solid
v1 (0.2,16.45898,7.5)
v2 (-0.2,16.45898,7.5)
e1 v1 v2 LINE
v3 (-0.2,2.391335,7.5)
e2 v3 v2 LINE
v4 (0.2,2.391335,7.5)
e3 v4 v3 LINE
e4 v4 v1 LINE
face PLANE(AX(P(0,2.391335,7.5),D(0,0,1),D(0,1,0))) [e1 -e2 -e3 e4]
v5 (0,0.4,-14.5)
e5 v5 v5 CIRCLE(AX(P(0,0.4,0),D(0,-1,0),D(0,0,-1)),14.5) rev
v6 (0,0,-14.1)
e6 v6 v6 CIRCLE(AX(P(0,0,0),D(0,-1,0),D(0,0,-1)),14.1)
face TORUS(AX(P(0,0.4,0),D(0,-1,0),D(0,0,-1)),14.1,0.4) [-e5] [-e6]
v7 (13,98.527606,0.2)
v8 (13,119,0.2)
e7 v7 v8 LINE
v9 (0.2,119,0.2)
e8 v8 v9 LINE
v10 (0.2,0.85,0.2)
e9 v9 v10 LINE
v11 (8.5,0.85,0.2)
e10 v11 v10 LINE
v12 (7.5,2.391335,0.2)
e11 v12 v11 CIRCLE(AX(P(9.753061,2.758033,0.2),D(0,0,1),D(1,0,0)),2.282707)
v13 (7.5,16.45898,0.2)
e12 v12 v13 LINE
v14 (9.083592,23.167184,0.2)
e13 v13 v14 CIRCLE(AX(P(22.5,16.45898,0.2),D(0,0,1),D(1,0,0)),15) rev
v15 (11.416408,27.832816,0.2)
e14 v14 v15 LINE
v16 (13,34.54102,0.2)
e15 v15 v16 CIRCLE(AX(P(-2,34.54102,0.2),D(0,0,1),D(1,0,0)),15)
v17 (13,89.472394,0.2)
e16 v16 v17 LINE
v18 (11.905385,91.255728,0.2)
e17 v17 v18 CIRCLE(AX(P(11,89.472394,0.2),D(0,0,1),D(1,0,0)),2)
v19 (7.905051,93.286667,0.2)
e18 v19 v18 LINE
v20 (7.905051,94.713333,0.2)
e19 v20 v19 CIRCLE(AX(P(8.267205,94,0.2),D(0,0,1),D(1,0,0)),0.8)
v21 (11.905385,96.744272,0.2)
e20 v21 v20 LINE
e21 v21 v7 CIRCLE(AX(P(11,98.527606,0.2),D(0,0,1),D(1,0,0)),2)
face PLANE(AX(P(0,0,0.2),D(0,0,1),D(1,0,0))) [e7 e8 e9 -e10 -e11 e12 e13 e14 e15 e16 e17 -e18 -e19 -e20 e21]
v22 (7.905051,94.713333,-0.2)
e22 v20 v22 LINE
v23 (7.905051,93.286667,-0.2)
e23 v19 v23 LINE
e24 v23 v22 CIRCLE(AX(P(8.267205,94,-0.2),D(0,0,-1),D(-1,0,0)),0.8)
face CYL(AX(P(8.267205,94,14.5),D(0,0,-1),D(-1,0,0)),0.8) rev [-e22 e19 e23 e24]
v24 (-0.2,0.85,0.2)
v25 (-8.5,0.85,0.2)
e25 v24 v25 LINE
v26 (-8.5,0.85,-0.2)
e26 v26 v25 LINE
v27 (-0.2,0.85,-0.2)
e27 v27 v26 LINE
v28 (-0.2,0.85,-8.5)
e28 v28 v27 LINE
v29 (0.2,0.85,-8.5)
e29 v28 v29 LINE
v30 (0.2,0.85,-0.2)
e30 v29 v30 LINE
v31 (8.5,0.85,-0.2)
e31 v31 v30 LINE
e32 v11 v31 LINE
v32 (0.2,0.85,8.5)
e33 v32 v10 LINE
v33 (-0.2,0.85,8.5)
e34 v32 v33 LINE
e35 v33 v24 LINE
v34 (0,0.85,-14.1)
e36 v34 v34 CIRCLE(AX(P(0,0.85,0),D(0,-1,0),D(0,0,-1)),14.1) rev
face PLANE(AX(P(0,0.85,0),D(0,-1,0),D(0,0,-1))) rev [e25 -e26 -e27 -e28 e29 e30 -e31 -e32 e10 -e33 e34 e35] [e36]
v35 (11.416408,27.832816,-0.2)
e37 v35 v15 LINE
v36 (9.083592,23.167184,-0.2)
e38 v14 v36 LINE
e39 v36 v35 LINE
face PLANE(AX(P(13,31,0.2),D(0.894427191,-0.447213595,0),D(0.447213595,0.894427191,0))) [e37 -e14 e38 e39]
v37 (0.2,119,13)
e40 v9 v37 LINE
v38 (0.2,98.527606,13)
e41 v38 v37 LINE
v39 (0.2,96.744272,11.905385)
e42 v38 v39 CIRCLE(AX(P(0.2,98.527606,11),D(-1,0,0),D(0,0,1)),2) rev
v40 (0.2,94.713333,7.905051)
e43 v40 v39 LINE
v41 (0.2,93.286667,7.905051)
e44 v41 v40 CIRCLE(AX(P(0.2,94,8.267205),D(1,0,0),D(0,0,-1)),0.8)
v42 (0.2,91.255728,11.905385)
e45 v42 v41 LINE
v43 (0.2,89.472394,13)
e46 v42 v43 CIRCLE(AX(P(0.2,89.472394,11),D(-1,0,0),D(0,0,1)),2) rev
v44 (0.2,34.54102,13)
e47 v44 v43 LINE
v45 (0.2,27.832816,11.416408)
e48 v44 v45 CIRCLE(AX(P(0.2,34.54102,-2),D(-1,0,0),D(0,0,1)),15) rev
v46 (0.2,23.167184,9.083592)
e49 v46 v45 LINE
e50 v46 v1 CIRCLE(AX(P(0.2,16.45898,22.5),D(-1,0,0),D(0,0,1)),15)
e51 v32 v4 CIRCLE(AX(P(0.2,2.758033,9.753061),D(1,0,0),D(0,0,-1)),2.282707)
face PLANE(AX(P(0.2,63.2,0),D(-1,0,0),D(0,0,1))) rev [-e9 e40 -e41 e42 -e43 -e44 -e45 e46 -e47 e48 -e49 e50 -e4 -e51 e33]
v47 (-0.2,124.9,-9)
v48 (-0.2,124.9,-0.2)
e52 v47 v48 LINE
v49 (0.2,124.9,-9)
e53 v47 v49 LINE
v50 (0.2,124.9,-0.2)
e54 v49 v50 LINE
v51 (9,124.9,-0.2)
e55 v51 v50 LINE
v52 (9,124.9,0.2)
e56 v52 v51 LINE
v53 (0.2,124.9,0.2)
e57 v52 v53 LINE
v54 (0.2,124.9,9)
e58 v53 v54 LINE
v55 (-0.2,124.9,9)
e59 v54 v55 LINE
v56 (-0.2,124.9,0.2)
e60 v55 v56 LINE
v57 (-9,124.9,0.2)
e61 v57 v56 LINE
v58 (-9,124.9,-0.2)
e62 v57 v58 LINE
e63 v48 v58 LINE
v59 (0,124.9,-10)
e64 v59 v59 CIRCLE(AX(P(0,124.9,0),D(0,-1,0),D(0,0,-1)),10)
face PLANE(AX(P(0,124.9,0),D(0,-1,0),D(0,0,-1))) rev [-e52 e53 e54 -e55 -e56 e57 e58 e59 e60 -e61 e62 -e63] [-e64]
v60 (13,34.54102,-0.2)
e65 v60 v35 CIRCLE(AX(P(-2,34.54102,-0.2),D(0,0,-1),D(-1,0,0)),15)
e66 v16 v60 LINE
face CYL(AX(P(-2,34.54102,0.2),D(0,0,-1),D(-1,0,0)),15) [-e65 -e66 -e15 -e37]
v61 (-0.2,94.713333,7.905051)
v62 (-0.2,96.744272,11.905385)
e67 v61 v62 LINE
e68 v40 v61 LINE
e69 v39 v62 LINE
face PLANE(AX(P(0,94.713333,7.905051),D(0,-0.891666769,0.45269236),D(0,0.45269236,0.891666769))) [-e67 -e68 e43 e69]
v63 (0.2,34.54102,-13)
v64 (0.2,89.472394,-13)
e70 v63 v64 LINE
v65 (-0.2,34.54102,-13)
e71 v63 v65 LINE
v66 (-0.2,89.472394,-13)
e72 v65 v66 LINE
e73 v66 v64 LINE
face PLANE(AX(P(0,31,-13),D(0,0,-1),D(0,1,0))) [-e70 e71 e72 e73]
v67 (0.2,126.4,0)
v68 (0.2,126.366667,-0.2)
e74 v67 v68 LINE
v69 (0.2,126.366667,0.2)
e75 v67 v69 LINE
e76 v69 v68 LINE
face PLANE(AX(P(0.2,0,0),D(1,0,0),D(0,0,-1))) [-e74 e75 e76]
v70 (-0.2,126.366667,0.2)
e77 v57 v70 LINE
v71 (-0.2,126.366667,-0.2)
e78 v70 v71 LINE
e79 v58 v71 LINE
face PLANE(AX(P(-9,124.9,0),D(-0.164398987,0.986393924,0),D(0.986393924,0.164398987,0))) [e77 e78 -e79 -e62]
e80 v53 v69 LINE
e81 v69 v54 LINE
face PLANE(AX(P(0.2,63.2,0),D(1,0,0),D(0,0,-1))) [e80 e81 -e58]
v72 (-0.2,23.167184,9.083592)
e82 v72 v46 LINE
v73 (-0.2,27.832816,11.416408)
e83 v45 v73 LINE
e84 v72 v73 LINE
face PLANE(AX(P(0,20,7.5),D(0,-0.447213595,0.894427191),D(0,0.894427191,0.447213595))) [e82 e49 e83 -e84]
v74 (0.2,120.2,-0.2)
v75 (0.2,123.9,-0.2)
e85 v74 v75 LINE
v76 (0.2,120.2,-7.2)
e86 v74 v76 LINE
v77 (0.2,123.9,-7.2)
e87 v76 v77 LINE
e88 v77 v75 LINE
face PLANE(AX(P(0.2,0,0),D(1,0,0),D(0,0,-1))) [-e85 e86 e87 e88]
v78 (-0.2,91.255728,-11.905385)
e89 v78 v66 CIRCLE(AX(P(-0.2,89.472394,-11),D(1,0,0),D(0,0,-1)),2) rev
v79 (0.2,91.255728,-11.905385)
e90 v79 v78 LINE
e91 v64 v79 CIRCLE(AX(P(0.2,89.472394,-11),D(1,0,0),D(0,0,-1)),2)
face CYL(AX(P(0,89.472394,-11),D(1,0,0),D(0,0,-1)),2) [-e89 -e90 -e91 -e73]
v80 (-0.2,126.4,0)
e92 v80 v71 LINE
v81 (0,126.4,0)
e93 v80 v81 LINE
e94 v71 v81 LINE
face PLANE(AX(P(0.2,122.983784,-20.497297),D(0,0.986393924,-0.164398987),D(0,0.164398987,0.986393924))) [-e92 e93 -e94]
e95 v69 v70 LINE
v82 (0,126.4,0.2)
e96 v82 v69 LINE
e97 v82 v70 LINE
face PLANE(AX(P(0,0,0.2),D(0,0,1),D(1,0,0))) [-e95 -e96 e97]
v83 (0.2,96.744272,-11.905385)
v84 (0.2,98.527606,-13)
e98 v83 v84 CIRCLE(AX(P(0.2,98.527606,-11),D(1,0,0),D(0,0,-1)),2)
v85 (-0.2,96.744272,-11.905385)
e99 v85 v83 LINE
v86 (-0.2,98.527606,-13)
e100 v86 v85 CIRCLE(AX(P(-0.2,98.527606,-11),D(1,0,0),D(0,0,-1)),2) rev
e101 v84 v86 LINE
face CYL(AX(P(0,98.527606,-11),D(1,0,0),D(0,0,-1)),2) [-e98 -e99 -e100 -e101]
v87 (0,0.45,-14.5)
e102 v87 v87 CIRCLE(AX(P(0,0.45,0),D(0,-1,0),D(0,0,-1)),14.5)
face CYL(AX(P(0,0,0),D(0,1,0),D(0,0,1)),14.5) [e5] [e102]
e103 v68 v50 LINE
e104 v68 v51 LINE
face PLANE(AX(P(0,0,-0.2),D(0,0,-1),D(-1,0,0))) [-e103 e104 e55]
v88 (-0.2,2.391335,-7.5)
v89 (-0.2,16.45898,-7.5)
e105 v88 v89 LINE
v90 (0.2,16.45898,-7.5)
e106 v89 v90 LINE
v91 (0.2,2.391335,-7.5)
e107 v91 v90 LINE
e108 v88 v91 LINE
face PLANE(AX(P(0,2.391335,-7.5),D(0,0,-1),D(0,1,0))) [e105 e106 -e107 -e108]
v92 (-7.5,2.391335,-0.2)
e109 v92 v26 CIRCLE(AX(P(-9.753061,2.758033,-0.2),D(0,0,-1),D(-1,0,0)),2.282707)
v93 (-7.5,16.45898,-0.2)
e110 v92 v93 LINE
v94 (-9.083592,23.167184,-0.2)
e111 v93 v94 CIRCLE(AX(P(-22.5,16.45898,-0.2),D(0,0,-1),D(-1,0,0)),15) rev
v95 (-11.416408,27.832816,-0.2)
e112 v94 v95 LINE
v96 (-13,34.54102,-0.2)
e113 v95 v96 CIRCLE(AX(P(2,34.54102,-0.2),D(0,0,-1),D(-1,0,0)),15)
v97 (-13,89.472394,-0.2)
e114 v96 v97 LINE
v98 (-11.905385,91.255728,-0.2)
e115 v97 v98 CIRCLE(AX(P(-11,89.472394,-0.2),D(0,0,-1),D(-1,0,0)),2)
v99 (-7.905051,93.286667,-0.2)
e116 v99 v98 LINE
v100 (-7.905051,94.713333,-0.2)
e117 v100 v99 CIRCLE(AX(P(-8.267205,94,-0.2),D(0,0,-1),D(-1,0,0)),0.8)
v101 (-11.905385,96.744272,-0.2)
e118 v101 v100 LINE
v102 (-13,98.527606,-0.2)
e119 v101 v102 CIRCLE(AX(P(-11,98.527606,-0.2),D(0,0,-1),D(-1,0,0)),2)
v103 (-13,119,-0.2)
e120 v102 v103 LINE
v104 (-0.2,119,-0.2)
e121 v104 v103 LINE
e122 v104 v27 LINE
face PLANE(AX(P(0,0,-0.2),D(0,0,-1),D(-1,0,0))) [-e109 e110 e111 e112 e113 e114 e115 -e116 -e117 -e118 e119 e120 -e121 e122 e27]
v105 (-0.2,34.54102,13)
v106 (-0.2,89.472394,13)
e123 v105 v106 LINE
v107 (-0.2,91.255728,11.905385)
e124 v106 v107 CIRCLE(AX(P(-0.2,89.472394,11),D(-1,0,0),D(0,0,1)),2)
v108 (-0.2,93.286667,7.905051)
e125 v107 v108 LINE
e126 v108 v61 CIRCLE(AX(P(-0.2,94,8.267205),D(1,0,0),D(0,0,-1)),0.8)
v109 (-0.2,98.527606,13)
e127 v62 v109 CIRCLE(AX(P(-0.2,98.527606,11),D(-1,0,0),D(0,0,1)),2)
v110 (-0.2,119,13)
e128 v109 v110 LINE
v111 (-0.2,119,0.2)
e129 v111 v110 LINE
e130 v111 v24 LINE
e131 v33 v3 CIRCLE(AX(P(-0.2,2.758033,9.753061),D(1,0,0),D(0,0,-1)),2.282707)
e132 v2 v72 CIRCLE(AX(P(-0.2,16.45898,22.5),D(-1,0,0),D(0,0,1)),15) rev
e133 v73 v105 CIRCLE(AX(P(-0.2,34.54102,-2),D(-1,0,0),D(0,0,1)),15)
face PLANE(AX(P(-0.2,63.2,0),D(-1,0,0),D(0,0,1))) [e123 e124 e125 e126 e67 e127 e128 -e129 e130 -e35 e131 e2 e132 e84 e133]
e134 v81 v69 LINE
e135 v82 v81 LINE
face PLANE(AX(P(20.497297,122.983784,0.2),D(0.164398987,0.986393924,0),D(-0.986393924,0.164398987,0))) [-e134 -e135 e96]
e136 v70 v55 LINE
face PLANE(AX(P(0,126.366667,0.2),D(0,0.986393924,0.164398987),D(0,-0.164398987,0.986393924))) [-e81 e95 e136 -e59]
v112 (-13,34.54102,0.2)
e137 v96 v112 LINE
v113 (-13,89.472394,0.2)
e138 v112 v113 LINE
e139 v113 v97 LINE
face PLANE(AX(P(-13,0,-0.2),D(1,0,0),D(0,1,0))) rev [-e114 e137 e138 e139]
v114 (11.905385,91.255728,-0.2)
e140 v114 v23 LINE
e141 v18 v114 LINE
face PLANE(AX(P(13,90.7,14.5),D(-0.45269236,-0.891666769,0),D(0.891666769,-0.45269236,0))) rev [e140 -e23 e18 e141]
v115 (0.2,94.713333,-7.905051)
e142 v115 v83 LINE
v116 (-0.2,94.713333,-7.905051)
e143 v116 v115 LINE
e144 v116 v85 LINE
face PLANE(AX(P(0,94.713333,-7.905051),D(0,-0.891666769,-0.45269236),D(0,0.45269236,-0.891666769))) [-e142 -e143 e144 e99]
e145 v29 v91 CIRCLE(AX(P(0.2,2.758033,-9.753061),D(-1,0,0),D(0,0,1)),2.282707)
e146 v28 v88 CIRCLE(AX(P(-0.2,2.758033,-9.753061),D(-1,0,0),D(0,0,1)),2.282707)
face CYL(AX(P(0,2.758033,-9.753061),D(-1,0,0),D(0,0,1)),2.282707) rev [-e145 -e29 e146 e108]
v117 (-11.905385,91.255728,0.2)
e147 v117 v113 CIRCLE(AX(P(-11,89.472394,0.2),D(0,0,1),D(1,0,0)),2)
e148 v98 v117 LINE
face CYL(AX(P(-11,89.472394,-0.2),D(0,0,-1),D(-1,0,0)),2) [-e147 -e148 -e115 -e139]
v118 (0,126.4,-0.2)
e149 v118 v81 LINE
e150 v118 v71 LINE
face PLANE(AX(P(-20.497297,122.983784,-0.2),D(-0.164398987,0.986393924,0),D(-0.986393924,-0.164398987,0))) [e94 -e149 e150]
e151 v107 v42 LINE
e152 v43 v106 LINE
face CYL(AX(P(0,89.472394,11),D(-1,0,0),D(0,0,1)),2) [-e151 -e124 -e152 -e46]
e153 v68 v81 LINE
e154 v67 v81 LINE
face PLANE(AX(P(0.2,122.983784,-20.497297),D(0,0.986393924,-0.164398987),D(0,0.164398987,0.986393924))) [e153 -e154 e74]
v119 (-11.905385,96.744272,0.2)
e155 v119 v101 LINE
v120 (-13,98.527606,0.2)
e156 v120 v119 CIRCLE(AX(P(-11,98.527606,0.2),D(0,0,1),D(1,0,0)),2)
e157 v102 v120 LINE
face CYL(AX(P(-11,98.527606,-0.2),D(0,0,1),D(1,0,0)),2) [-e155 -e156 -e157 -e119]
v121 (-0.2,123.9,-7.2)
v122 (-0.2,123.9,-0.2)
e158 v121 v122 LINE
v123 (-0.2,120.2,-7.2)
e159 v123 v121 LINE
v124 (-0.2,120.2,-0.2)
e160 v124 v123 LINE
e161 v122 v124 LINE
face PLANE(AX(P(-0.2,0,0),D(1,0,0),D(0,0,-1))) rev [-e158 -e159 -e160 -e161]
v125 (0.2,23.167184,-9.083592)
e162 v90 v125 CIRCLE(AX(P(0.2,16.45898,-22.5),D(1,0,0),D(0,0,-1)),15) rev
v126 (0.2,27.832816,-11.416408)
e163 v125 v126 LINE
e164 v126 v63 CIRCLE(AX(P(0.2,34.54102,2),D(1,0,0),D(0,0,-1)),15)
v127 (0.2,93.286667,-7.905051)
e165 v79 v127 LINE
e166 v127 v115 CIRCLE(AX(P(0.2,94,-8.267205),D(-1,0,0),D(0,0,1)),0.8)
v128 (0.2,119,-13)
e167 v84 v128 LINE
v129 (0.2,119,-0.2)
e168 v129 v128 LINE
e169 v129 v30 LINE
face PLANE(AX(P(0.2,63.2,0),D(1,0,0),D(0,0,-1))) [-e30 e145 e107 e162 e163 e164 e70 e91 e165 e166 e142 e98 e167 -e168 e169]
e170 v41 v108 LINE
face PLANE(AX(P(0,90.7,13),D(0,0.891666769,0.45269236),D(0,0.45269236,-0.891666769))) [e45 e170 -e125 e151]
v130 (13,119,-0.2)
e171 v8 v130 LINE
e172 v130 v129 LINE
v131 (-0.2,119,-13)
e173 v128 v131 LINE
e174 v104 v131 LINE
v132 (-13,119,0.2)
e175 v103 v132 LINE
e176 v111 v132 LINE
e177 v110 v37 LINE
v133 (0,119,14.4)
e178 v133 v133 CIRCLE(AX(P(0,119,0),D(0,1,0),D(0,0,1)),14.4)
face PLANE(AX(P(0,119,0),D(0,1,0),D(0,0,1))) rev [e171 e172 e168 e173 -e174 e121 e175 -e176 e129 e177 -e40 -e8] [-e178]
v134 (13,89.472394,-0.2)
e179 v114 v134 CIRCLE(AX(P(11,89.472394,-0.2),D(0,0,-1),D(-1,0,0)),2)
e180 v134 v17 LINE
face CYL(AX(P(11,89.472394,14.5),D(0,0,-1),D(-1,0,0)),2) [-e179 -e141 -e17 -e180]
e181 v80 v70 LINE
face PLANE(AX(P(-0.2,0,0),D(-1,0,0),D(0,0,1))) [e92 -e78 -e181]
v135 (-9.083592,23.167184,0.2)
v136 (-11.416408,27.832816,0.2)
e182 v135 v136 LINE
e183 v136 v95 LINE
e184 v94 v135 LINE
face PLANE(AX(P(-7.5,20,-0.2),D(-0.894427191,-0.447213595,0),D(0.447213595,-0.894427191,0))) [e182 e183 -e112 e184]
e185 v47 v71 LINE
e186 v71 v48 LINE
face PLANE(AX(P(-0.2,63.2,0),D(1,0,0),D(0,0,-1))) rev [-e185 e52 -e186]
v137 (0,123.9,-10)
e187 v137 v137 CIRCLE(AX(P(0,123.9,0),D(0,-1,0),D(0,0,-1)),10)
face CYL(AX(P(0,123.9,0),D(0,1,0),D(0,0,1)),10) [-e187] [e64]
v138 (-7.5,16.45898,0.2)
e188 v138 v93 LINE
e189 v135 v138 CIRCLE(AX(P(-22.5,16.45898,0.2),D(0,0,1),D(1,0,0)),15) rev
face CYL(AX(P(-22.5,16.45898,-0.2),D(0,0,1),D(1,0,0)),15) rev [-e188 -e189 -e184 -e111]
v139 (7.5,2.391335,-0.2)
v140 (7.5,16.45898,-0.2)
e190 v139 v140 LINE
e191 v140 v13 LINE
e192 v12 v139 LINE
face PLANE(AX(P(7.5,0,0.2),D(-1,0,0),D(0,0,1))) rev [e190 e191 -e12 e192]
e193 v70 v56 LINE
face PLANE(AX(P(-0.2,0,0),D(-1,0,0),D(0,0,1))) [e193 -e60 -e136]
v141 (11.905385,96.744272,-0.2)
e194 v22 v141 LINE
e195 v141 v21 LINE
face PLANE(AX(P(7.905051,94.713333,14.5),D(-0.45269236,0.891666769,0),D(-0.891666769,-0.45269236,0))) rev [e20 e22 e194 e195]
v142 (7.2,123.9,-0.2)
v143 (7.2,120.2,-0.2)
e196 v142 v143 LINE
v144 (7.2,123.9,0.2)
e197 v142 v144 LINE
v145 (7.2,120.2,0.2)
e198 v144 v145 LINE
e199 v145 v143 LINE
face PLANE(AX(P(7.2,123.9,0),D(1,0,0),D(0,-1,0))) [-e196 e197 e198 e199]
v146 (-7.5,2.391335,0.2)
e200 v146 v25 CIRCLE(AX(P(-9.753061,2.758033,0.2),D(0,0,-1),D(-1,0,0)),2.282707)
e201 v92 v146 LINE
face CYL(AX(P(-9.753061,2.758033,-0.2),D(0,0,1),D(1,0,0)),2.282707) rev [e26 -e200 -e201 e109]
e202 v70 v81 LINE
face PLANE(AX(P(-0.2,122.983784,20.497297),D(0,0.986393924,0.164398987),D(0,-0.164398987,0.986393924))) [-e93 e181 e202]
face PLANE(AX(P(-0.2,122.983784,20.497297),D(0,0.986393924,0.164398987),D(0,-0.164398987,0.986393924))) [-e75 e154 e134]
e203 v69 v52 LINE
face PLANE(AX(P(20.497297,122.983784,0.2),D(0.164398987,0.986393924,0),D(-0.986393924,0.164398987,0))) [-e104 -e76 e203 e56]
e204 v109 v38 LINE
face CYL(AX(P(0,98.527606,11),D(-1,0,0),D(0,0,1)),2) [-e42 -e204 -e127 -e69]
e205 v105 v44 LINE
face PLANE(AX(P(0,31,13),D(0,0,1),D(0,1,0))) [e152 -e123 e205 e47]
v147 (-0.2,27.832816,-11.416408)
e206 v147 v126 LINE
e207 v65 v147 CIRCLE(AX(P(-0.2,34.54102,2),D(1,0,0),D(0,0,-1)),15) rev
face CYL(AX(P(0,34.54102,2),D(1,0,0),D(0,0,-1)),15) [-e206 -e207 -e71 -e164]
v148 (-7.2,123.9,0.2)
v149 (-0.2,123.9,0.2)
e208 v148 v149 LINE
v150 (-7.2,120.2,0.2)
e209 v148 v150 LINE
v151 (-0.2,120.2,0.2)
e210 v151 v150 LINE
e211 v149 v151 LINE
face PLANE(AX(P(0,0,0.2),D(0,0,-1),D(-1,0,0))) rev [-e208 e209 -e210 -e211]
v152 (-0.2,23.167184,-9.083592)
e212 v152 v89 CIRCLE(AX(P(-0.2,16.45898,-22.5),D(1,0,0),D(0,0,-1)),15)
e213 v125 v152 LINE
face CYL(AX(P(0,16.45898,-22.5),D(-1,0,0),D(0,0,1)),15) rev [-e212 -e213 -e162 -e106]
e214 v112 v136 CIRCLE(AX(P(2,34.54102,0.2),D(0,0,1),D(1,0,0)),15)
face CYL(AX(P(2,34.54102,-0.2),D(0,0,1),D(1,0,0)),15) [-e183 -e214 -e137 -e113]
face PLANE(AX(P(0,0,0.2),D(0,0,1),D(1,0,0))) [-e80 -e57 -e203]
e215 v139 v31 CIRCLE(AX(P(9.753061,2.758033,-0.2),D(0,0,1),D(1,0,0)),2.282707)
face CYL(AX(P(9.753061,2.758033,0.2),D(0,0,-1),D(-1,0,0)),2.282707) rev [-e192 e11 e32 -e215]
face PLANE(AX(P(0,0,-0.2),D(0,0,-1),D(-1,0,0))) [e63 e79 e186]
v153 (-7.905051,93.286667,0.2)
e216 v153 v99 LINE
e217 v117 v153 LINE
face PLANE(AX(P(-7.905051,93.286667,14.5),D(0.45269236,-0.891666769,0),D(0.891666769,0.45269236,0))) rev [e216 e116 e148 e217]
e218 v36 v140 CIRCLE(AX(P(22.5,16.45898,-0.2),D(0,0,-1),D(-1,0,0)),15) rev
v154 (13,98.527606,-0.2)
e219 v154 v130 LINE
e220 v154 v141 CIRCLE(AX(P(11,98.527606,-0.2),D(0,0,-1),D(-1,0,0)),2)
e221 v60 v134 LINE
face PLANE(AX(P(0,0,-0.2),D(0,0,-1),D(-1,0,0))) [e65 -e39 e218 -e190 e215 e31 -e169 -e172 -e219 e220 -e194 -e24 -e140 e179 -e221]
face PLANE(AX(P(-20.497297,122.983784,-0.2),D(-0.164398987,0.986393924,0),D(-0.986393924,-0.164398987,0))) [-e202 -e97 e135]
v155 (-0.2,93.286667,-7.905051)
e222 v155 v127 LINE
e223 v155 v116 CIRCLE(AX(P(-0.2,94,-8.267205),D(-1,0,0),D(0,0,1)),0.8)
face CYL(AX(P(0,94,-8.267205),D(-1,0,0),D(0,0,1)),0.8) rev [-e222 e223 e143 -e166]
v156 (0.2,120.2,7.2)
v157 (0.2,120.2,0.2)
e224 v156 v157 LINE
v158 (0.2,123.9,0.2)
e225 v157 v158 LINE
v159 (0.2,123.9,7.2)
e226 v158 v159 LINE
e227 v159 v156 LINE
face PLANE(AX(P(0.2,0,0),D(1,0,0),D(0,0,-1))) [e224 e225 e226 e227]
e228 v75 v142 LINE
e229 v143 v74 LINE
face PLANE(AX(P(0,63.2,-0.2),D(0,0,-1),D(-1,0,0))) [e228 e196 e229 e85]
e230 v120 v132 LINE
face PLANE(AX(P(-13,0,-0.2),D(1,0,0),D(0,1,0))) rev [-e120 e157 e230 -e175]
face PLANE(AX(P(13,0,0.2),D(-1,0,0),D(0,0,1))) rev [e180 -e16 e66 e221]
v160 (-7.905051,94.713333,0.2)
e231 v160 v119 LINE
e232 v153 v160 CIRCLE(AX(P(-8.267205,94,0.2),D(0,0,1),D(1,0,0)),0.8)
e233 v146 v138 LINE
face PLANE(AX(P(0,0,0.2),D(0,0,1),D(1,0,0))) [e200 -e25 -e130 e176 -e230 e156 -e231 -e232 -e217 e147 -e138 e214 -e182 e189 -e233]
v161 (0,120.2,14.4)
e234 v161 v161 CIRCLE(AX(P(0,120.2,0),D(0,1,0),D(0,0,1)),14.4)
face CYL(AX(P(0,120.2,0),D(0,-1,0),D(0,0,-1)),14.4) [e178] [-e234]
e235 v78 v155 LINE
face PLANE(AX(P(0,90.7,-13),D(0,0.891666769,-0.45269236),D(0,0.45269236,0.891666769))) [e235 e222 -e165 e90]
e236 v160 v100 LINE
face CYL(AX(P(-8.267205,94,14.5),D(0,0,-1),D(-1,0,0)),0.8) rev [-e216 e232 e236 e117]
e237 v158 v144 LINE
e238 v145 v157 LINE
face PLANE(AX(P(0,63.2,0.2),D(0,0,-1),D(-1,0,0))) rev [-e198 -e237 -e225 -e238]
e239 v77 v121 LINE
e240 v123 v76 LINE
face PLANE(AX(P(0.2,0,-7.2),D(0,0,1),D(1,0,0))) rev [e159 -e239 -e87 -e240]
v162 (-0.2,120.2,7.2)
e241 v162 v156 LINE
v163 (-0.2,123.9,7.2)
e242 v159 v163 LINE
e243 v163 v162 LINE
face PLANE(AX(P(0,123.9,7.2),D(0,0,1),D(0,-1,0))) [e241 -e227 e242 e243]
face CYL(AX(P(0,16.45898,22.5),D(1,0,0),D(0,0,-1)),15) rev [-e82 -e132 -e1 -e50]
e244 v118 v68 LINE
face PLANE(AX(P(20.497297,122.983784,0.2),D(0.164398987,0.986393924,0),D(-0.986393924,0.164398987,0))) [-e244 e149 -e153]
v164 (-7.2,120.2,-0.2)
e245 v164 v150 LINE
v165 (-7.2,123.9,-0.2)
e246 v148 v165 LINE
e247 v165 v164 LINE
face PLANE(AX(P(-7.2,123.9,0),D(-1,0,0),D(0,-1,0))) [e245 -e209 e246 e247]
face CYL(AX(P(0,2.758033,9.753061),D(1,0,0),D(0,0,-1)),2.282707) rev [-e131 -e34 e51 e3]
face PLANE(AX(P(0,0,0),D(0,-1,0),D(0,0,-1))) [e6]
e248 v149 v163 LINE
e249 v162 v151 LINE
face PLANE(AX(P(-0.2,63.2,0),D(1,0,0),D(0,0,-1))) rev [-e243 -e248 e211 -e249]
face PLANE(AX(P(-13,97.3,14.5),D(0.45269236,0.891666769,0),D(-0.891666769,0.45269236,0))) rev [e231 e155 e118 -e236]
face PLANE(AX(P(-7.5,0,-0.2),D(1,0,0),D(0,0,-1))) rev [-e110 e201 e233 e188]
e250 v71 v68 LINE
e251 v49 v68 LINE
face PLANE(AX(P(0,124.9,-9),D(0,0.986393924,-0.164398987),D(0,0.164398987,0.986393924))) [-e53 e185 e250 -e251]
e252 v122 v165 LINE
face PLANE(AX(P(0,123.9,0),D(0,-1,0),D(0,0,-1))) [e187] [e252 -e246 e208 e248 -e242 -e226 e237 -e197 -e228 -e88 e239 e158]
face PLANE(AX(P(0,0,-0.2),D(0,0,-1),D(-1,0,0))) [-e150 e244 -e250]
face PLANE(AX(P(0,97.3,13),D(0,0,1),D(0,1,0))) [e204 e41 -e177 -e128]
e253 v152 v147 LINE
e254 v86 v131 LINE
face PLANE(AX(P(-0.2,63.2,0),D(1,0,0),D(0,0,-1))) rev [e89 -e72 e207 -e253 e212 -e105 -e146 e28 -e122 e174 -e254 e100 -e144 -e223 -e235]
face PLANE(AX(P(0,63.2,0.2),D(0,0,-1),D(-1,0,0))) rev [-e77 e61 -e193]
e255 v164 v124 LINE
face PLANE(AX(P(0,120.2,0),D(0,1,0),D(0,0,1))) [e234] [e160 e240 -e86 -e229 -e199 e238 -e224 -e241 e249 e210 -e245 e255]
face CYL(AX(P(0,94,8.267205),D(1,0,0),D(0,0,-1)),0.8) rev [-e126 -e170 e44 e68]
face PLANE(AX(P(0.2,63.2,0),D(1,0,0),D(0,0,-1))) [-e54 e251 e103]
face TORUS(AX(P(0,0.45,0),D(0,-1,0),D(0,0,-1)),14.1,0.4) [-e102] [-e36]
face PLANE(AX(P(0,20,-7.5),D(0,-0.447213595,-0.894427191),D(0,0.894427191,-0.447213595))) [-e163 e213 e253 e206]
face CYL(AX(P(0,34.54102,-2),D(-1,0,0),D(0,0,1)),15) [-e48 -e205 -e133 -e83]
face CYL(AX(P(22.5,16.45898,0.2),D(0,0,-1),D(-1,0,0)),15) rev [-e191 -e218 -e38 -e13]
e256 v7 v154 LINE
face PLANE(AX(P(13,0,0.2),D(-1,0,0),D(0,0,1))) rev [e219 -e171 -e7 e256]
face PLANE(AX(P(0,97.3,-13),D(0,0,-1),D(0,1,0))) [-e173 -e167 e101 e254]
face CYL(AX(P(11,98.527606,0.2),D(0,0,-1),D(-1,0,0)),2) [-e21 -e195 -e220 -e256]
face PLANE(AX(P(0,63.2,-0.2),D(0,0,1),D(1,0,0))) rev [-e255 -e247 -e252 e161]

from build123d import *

# Parameters (mm, degrees)
EXTRUDE_START         = -0.2
EXTRUDE_1_OUTLINE_W   = 0.4
EXTRUDE_1_OUTLINE_H   = 3.7
EXTRUDE_1_DEPTH       = 0.4
EXTRUDE_START_2       = -7.2
EXTRUDE_1_2_OUTLINE_W = 0.4
EXTRUDE_1_2_OUTLINE_H = 3.7
EXTRUDE_1_2_DEPTH     = 7
EXTRUDE_START_3       = 119
EXTRUDE_1_3_OUTLINE_R = 14.4
EXTRUDE_1_3_DEPTH     = 1.2
EXTRUDE_1_4_OUTLINE_R = 14.5
EXTRUDE_1_4_DEPTH     = 0.85
EXTRUDE_START_4       = 123.9
EXTRUDE_1_5_OUTLINE_R = 10
EXTRUDE_1_5_DEPTH     = 1
EXTRUDE_1_6_DEPTH     = 0.4
CUT_EXTRUDE_1_DEPTH   = 129.075368436
CUT_EXTRUDE_2_DEPTH   = 129.075368436
DRAFT_1_ANGLE         = 63.434948823
DRAFT_2_ANGLE         = 63.434948823
RIB_1_REACH           = 130.053
SKETCH_4_WALL_W       = 267.026519706
SKETCH_4_WALL_H       = 0.4
RIB_2_REACH           = 130.053
SKETCH_5_WALL_W       = 267.026519706
SKETCH_5_WALL_H       = 0.4
RIB_3_REACH           = 130.053
SKETCH_6_WALL_W       = 267.026519706
SKETCH_6_WALL_H       = 0.4
RIB_4_REACH           = 130.053
SKETCH_7_WALL_W       = 261.805134662
SKETCH_7_WALL_H       = 0.4
RIB_5_REACH           = 130.053
SKETCH_8_WALL_W       = 261.805134662
SKETCH_8_WALL_H       = 0.4
RIB_6_REACH           = 130.053
SKETCH_9_WALL_W       = 261.805134662
SKETCH_9_WALL_H       = 0.4
RIB_START             = -0.2
RIB_7_DEPTH           = 0.4
RIB_8_DEPTH           = 0.4
FILLET_1_R            = 0.4
FILLET_2_R            = 2
FILLET_3_R            = 15


with BuildPart() as part:
    # 凸台-拉伸1: read off the stored shape, not the designer's step
    # 凸台-拉伸1 outline → 凸台-拉伸1 (new body)
    with BuildSketch(Plane.XY.offset(EXTRUDE_START)):
        Polygon((0, 126.4), (-0.2, 126.366666667), (-0.2, 124.9), (9, 124.9), (0.2, 126.366666667), align=None)
        with BuildLine():
            Line((13, 31), (13, 119))
            Line((13, 119), (-13, 119))
            Line((-13, 119), (-13, 20))
            Line((-13, 20), (-7.5, 20))
            Line((-7.5, 20), (-7.5, 2.391335203))
            ThreePointArc((-7.5, 2.391335203), (-7.838080215, 1.515615965), (-8.5, 0.85))
            Line((-8.5, 0.85), (8.5, 0.85))
            ThreePointArc((8.5, 0.85), (7.838080215, 1.515615965), (7.5, 2.391335203))
            Line((7.5, 2.391335203), (7.5, 31))
            Line((7.5, 31), (13, 31))
        make_face()
        with Locations((0, 122.05)):
            Rectangle(EXTRUDE_1_OUTLINE_W, EXTRUDE_1_OUTLINE_H)
    extrude(amount=EXTRUDE_1_DEPTH)

    # Extrude 1 2 outline → Extrude 1 2 (add)
    with BuildSketch(Plane.XY.offset(EXTRUDE_START_2)):
        with Locations((0, 122.05)):
            Rectangle(EXTRUDE_1_2_OUTLINE_W, EXTRUDE_1_2_OUTLINE_H)
    extrude(amount=EXTRUDE_1_2_DEPTH)

    # Extrude 1 3 outline → Extrude 1 3 (add)
    with BuildSketch(Plane(origin=(0, 0, 0), x_dir=(1, 0, 0), z_dir=(0, 1, 0)).offset(EXTRUDE_START_3)):
        Circle(EXTRUDE_1_3_OUTLINE_R)
    extrude(amount=EXTRUDE_1_3_DEPTH)

    # Extrude 1 4 outline → Extrude 1 4 (add)
    with BuildSketch(Plane(origin=(0, 0, 0), x_dir=(1, 0, 0), z_dir=(0, 1, 0))):
        Circle(EXTRUDE_1_4_OUTLINE_R)
    extrude(amount=EXTRUDE_1_4_DEPTH)

    # Extrude 1 5 outline → Extrude 1 5 (add)
    with BuildSketch(Plane(origin=(0, 0, 0), x_dir=(1, 0, 0), z_dir=(0, 1, 0)).offset(EXTRUDE_START_4)):
        Circle(EXTRUDE_1_5_OUTLINE_R)
    extrude(amount=EXTRUDE_1_5_DEPTH)

    # Extrude 1 6 outline → Extrude 1 6 (add)
    with BuildSketch(Plane.YZ.offset(EXTRUDE_START)):
        Polygon((126.366666667, -0.2), (126.4, 0), (126.366666667, 0.2), align=None)
    extrude(amount=EXTRUDE_1_6_DEPTH)

    # 草图2 → 切除-拉伸1 (cut, through all)
    with BuildSketch(Plane(origin=(0, 0, -0.2), x_dir=(-1, 0, 0), z_dir=(0, 0, -1))):
        with BuildLine():
            Line((-13, 90.7), (-7.905050667, 93.286666585))
            ThreePointArc((-7.905050667, 93.286666585), (-7.467204555, 94), (-7.905050667, 94.713333415))
            Line((-7.905050667, 94.713333415), (-13, 97.3))
            Line((-13, 97.3), (-13, 90.7))
        make_face()
    extrude(amount=-CUT_EXTRUDE_1_DEPTH, mode=Mode.SUBTRACT)

    # 草图3 → 切除-拉伸2 (cut, through all)
    with BuildSketch(Plane(origin=(0, 0, -0.2), x_dir=(-1, 0, 0), z_dir=(0, 0, -1))):
        with BuildLine():
            Line((13, 97.3), (7.905050667, 94.713333415))
            ThreePointArc((7.905050667, 94.713333415), (7.467204555, 94), (7.905050667, 93.286666585))
            Line((7.905050667, 93.286666585), (13, 90.7))
            Line((13, 90.7), (13, 97.3))
        make_face()
    extrude(amount=-CUT_EXTRUDE_2_DEPTH, mode=Mode.SUBTRACT)

    # 拔模1
    draft_1_faces = [part.faces().sort_by_distance(p)[0] for p in [
        (-10.25, 20, 0),
    ]]
    draft(draft_1_faces, Plane(origin=(-7.5, 0, -0.2), x_dir=(0, 0, -1), z_dir=(-1, 0, 0)), DRAFT_1_ANGLE)

    # 拔模2
    draft_2_faces = [part.faces().sort_by_distance(p)[0] for p in [
        (10.25, 31, 0),
    ]]
    draft(draft_2_faces, Plane(origin=(13, 0, 0.2), x_dir=(0, 0, 1), z_dir=(1, 0, 0)), DRAFT_2_ANGLE)

    # 草图4 wall → 筋1 (add, up to next)
    with BuildSketch(Plane(origin=(0, 125.633333334, 4.6), x_dir=(0, -0.164398987342, 0.986393923826), z_dir=(0, -0.986393923826, -0.164398987342)), mode=Mode.PRIVATE) as rib_1_sk1:
        Rectangle(SKETCH_4_WALL_W, SKETCH_4_WALL_H)
    rib_1_tool1 = extrude(rib_1_sk1.sketch, amount=RIB_1_REACH, mode=Mode.PRIVATE) - part.part
    add(rib_1_tool1.solids().sort_by_distance((0, 125.633333334, 4.6))[0])

    # 草图5 wall → 筋2 (add, up to next)
    with BuildSketch(Plane(origin=(-4.6, 125.633333334, 0), x_dir=(0.986393923826, 0.164398987342, 0), z_dir=(0.164398987342, -0.986393923826, 0)), mode=Mode.PRIVATE) as rib_2_sk1:
        Rectangle(SKETCH_5_WALL_W, SKETCH_5_WALL_H)
    rib_2_tool1 = extrude(rib_2_sk1.sketch, amount=RIB_2_REACH, mode=Mode.PRIVATE) - part.part
    add(rib_2_tool1.solids().sort_by_distance((-4.6, 125.633333334, 0))[0])

    # 草图6 wall → 筋3 (add, up to next)
    with BuildSketch(Plane(origin=(0, 125.633333334, -4.6), x_dir=(0, 0.164398987342, 0.986393923826), z_dir=(0, -0.986393923826, 0.164398987342)), mode=Mode.PRIVATE) as rib_3_sk1:
        Rectangle(SKETCH_6_WALL_W, SKETCH_6_WALL_H)
    rib_3_tool1 = extrude(rib_3_sk1.sketch, amount=RIB_3_REACH, mode=Mode.PRIVATE) - part.part
    add(rib_3_tool1.solids().sort_by_distance((0, 125.633333334, -4.6))[0])

    # 草图7 wall → 筋4 (add, up to next)
    with BuildSketch(Plane(origin=(-7.2, 122.05, 0), x_dir=(0, -1, 0), z_dir=(1, 0, 0)), mode=Mode.PRIVATE) as rib_4_sk1:
        Rectangle(SKETCH_7_WALL_W, SKETCH_7_WALL_H)
    rib_4_tool1 = extrude(rib_4_sk1.sketch, amount=RIB_4_REACH, mode=Mode.PRIVATE) - part.part
    add(rib_4_tool1.solids().sort_by_distance((-7.2, 122.05, 0))[0])

    # 草图8 wall → 筋5 (add, up to next)
    with BuildSketch(Plane(origin=(0, 122.05, 7.2), x_dir=(0, -1, 0), z_dir=(0, 0, -1)), mode=Mode.PRIVATE) as rib_5_sk1:
        Rectangle(SKETCH_8_WALL_W, SKETCH_8_WALL_H)
    rib_5_tool1 = extrude(rib_5_sk1.sketch, amount=RIB_5_REACH, mode=Mode.PRIVATE) - part.part
    add(rib_5_tool1.solids().sort_by_distance((0, 122.05, 7.2))[0])

    # 草图9 wall → 筋6 (add, up to next)
    with BuildSketch(Plane(origin=(7.2, 122.05, 0), x_dir=(0, -1, 0), z_dir=(-1, 0, 0)), mode=Mode.PRIVATE) as rib_6_sk1:
        Rectangle(SKETCH_9_WALL_W, SKETCH_9_WALL_H)
    rib_6_tool1 = extrude(rib_6_sk1.sketch, amount=RIB_6_REACH, mode=Mode.PRIVATE) - part.part
    add(rib_6_tool1.solids().sort_by_distance((7.2, 122.05, 0))[0])

    # 筋7: read off the stored shape, not the designer's step
    # 筋7 outline → 筋7 (add)
    with BuildSketch(Plane(origin=(0, 0, 0), x_dir=(0, 0, -1), z_dir=(1, 0, 0)).offset(RIB_START)):
        with BuildLine():
            Line((7.905050667, 94.713333415), (13, 97.3))
            Line((13, 97.3), (13, 119))
            Line((13, 119), (0.2, 119))
            Line((0.2, 119), (0.2, 0.85))
            Line((0.2, 0.85), (8.5, 0.85))
            ThreePointArc((8.5, 0.85), (7.838080215, 1.515615965), (7.5, 2.391335203))
            Line((7.5, 2.391335203), (7.5, 20))
            Line((7.5, 20), (13, 31))
            Line((13, 31), (13, 90.7))
            Line((13, 90.7), (7.905050667, 93.286666585))
            ThreePointArc((7.905050667, 93.286666585), (7.467204555, 94), (7.905050667, 94.713333415))
        make_face()
    extrude(amount=RIB_7_DEPTH)

    # 筋8: read off the stored shape, not the designer's step
    # 筋8 outline → 筋8 (add)
    with BuildSketch(Plane(origin=(0, 0, 0), x_dir=(0, -1, 0), z_dir=(-1, 0, 0)).offset(RIB_START)):
        with BuildLine():
            Line((-94.713333415, 7.905050667), (-97.3, 13))
            Line((-97.3, 13), (-119, 13))
            Line((-119, 13), (-119, 0.2))
            Line((-119, 0.2), (-0.85, 0.2))
            Line((-0.85, 0.2), (-0.85, 8.5))
            ThreePointArc((-0.85, 8.5), (-1.515615965, 7.838080215), (-2.391335203, 7.5))
            Line((-2.391335203, 7.5), (-20, 7.5))
            Line((-20, 7.5), (-31, 13))
            Line((-31, 13), (-90.7, 13))
            Line((-90.7, 13), (-93.286666585, 7.905050667))
            ThreePointArc((-93.286666585, 7.905050667), (-94, 7.467204555), (-94.713333415, 7.905050667))
        make_face()
    extrude(amount=RIB_8_DEPTH)

    # 圆角1
    fillet_1_edges = [part.edges().sort_by_distance(p)[0] for p in [
        (-14.5, 0, 0),
        (-14.5, 0.85, 0),
    ]]
    fillet(fillet_1_edges, radius=FILLET_1_R)

    # 圆角2
    fillet_2_edges = [part.edges().sort_by_distance(p)[0] for p in [
        (13, 90.7, 0),
        (13, 97.3, 0),
        (-13, 97.3, 0),
        (-13, 90.7, 0),
        (0, 90.7, -13),
        (0, 97.3, -13),
        (0, 90.7, 13),
        (0, 97.3, 13),
    ]]
    fillet(fillet_2_edges, radius=FILLET_2_R)

    # 圆角3
    fillet_3_edges = [part.edges().sort_by_distance(p)[0] for p in [
        (-13, 31, 0),
        (-7.5, 20, 0),
        (7.5, 20, 0),
        (13, 31, 0),
        (0, 20, -7.5),
        (0, 31, -13),
        (0, 20, 7.5),
        (0, 31, 13),
    ]]
    fillet(fillet_3_edges, radius=FILLET_3_R)


solid = part.part
